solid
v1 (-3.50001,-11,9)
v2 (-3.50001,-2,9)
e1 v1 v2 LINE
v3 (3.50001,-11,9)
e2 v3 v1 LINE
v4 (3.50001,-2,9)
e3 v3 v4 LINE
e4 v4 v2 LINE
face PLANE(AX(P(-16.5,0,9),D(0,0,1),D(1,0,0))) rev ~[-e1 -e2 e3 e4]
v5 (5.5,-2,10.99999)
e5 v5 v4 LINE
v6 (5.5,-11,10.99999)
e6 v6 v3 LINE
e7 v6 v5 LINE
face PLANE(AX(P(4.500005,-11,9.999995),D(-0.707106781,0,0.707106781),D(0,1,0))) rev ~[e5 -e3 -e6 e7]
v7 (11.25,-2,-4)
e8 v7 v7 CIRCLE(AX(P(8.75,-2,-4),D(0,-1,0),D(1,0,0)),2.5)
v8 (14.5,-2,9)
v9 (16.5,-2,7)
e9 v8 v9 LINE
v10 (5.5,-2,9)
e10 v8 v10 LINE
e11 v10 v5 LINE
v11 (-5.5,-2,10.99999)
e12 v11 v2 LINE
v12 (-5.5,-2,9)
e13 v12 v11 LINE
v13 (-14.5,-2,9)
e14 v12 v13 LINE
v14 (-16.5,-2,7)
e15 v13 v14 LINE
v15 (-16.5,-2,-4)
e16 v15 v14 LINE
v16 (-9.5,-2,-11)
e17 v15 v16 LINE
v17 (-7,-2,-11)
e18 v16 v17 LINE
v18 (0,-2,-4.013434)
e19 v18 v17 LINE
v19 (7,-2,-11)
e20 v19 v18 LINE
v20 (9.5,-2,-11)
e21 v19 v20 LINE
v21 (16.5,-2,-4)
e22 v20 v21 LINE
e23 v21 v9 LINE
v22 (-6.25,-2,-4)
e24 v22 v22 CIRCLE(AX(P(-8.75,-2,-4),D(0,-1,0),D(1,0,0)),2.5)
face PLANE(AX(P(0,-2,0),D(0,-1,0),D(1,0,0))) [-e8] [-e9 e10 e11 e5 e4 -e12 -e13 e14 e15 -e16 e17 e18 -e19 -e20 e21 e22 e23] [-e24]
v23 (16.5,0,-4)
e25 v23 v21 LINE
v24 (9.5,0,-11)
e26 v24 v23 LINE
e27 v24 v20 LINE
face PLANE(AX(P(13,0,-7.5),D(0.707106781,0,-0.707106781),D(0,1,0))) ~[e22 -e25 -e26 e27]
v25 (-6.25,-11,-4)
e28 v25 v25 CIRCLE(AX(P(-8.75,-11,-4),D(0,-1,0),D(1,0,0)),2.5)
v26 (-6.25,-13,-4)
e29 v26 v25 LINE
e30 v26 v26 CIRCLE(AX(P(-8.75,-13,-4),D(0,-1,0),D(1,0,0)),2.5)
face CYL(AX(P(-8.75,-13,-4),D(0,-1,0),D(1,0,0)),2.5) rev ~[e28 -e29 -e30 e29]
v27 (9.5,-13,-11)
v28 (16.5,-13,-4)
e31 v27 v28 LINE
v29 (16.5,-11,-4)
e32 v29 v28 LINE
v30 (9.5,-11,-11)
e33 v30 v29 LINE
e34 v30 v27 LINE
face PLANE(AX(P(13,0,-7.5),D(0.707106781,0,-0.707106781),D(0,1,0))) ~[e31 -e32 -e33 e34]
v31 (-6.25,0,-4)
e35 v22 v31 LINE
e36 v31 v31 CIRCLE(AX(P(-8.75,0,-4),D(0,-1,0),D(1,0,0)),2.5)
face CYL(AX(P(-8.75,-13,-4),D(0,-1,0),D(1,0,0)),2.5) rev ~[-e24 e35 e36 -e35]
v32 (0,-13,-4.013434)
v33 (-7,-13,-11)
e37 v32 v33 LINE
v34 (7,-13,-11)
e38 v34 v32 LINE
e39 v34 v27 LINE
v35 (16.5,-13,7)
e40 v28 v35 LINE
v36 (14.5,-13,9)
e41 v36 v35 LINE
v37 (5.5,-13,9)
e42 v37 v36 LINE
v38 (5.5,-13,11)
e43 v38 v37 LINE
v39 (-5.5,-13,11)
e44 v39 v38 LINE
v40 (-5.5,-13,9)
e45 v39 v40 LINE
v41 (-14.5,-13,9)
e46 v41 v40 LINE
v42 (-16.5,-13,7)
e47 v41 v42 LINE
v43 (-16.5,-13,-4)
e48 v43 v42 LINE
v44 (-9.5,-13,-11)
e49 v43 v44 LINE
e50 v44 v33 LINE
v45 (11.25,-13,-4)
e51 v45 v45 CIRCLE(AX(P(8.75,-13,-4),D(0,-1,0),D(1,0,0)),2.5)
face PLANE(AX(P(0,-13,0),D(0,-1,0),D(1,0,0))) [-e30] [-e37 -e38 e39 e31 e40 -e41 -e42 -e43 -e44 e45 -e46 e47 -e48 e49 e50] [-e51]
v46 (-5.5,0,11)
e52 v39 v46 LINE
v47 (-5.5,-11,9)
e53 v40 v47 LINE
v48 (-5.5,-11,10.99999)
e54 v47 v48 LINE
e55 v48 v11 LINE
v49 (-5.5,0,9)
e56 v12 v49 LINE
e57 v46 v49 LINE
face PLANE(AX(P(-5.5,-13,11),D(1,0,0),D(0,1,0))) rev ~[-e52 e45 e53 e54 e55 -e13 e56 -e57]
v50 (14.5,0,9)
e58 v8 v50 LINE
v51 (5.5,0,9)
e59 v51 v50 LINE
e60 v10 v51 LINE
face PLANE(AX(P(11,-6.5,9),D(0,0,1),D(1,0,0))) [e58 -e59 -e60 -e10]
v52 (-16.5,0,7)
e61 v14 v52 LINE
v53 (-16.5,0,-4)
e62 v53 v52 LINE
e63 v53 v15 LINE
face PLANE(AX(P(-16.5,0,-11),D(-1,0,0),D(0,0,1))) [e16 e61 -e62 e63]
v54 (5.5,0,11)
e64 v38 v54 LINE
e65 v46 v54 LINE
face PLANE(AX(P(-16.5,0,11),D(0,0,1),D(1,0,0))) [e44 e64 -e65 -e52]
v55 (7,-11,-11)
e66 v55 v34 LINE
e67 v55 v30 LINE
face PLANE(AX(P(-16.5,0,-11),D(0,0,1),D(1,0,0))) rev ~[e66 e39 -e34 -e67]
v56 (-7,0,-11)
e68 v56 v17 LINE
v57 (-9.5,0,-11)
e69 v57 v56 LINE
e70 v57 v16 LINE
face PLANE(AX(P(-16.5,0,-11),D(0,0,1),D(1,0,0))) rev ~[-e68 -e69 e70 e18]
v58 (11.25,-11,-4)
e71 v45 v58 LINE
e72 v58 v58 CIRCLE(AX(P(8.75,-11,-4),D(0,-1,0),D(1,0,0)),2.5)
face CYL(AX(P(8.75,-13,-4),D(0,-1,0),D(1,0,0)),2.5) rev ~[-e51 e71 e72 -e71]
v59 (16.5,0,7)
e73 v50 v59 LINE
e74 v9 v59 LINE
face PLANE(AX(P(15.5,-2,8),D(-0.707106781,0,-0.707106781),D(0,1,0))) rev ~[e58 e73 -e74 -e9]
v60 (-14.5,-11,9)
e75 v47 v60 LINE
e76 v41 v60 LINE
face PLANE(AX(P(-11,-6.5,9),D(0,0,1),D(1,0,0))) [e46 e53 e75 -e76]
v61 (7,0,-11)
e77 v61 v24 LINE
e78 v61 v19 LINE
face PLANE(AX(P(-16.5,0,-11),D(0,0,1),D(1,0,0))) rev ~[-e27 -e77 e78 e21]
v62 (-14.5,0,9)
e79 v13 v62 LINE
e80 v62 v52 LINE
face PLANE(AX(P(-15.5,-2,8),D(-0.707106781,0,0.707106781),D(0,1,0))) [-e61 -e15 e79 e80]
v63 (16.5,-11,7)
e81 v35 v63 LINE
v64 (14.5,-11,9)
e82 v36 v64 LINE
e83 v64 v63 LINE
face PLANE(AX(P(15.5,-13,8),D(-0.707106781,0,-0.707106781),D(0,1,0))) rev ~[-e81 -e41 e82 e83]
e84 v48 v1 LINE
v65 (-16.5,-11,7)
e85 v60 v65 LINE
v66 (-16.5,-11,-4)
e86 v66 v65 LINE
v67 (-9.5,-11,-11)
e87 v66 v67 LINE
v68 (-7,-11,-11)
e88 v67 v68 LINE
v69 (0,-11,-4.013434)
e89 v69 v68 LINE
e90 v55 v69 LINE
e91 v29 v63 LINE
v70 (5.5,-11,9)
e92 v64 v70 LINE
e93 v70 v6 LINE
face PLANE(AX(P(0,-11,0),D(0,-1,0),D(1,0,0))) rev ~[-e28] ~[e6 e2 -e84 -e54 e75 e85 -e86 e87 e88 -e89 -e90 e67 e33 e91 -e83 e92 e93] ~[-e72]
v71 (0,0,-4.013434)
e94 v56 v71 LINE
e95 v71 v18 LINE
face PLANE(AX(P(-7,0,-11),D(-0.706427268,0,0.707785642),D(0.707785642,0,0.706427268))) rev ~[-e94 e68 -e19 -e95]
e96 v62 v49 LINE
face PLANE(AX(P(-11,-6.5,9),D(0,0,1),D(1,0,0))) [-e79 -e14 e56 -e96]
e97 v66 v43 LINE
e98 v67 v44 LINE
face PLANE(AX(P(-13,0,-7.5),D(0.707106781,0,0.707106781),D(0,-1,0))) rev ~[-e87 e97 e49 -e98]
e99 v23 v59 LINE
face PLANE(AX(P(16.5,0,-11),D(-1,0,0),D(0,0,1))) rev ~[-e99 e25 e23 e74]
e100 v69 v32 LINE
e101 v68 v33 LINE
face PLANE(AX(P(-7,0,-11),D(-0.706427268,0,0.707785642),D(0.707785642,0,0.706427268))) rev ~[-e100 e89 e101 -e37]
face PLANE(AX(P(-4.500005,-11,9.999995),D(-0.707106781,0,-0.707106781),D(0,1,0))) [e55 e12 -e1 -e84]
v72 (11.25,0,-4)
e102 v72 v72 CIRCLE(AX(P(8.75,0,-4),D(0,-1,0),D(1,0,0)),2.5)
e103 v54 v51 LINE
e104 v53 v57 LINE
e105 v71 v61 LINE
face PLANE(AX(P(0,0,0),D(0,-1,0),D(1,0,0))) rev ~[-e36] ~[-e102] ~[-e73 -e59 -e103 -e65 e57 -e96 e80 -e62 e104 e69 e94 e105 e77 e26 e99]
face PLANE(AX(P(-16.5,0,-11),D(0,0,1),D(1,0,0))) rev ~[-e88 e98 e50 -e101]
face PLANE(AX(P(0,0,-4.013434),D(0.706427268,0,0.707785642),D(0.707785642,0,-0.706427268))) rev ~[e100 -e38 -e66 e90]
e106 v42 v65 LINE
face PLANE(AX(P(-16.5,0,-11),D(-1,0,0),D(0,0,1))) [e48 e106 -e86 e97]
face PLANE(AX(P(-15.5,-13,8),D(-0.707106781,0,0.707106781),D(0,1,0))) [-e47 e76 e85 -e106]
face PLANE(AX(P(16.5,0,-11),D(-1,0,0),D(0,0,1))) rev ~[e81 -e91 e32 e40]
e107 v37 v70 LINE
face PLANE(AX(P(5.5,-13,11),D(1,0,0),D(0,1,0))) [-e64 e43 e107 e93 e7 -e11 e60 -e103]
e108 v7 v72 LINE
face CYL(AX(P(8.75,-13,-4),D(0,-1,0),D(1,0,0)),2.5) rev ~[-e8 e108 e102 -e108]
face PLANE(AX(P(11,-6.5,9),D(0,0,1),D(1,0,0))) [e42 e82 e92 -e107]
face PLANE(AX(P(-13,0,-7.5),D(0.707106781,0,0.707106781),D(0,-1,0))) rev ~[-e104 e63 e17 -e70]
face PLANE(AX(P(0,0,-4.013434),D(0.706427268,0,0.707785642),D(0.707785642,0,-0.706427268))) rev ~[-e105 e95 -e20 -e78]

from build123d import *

# Parameters (mm, degrees)
F0_W      = 33
F0_H      = 22
F2_DEPTH  = 13
F3_SIZE   = 7
F4_R      = 2.5
F5_DEPTH  = 25
F6_T      = -2
F7_W      = 11
F7_H      = 13
F8_DEPTH  = 2
F9_SIZE   = 1.99999
F11_DEPTH = 25
F12_SIZE  = 2


# Not quite as in the source:
# - a fillet or chamfer is up to 0.001 mm smaller than in the source, because OpenCascade refuses the exact size


with BuildPart() as f2:
    # F0 (on Front) → F2 (new body)
    with BuildSketch(Plane.XZ):
        Rectangle(F0_W, F0_H)
    extrude(amount=F2_DEPTH)

    # F3
    f3_edges = [f2.edges().sort_by_distance(p)[0] for p in [
        (-16.5, -6.5, -11),
        (16.5, -6.5, -11),
    ]]
    chamfer(f3_edges, length=F3_SIZE)

    # F4 (on face) → F5 (cut)
    with BuildSketch(Plane.XZ.offset(13)):
        with Locations((-8.75, -4)):
            Circle(F4_R)
        with Locations((8.75, -4)):
            Circle(F4_R)
    extrude(amount=-F5_DEPTH, mode=Mode.SUBTRACT)

    # F6
    f6_openings = [f2.faces().sort_by_distance(p)[0] for p in [
        (0, -6.5, -11),
        (13, -6.5, -7.5),
        (16.5, -6.5, 3.5),
        (-16.5, -6.5, 3.5),
        (-13, -6.5, -7.5),
        (-11.25, -6.5, -4),
        (6.25, -6.5, -4),
    ]]
    offset(amount=F6_T, openings=f6_openings)

    # F7 (on face) → F8 (cut)
    with BuildSketch(Plane.XY.offset(11)):
        with Locations((11, -6.5)):
            Rectangle(F7_W, F7_H)
        with Locations((-11, -6.5)):
            Rectangle(F7_W, F7_H)
    extrude(amount=-F8_DEPTH, mode=Mode.SUBTRACT)

    # F9 (size 2 in the source; OpenCascade refuses exactly that, so slightly less here)
    f9_edges = [f2.edges().sort_by_distance(p)[0] for p in [
        (5.5, -6.5, 9),
        (-5.5, -6.5, 9),
    ]]
    chamfer(f9_edges, length=F9_SIZE)

    # F10 (on face) → F11 (cut)
    with BuildSketch(Plane(origin=(0, 0, 0), x_dir=(-1, 0, 0), z_dir=(0, 1, 0))):
        Polygon((7, -11), (0, -4.0134343201), (-7, -11), align=None)
    extrude(amount=-F11_DEPTH, mode=Mode.SUBTRACT)

    # F12
    f12_edges = [f2.edges().sort_by_distance(p)[0] for p in [
        (16.5, -12, 9),
        (16.5, -1, 9),
        (-16.5, -12, 9),
        (-16.5, -1, 9),
    ]]
    chamfer(f12_edges, length=F12_SIZE)


solid = f2.part
